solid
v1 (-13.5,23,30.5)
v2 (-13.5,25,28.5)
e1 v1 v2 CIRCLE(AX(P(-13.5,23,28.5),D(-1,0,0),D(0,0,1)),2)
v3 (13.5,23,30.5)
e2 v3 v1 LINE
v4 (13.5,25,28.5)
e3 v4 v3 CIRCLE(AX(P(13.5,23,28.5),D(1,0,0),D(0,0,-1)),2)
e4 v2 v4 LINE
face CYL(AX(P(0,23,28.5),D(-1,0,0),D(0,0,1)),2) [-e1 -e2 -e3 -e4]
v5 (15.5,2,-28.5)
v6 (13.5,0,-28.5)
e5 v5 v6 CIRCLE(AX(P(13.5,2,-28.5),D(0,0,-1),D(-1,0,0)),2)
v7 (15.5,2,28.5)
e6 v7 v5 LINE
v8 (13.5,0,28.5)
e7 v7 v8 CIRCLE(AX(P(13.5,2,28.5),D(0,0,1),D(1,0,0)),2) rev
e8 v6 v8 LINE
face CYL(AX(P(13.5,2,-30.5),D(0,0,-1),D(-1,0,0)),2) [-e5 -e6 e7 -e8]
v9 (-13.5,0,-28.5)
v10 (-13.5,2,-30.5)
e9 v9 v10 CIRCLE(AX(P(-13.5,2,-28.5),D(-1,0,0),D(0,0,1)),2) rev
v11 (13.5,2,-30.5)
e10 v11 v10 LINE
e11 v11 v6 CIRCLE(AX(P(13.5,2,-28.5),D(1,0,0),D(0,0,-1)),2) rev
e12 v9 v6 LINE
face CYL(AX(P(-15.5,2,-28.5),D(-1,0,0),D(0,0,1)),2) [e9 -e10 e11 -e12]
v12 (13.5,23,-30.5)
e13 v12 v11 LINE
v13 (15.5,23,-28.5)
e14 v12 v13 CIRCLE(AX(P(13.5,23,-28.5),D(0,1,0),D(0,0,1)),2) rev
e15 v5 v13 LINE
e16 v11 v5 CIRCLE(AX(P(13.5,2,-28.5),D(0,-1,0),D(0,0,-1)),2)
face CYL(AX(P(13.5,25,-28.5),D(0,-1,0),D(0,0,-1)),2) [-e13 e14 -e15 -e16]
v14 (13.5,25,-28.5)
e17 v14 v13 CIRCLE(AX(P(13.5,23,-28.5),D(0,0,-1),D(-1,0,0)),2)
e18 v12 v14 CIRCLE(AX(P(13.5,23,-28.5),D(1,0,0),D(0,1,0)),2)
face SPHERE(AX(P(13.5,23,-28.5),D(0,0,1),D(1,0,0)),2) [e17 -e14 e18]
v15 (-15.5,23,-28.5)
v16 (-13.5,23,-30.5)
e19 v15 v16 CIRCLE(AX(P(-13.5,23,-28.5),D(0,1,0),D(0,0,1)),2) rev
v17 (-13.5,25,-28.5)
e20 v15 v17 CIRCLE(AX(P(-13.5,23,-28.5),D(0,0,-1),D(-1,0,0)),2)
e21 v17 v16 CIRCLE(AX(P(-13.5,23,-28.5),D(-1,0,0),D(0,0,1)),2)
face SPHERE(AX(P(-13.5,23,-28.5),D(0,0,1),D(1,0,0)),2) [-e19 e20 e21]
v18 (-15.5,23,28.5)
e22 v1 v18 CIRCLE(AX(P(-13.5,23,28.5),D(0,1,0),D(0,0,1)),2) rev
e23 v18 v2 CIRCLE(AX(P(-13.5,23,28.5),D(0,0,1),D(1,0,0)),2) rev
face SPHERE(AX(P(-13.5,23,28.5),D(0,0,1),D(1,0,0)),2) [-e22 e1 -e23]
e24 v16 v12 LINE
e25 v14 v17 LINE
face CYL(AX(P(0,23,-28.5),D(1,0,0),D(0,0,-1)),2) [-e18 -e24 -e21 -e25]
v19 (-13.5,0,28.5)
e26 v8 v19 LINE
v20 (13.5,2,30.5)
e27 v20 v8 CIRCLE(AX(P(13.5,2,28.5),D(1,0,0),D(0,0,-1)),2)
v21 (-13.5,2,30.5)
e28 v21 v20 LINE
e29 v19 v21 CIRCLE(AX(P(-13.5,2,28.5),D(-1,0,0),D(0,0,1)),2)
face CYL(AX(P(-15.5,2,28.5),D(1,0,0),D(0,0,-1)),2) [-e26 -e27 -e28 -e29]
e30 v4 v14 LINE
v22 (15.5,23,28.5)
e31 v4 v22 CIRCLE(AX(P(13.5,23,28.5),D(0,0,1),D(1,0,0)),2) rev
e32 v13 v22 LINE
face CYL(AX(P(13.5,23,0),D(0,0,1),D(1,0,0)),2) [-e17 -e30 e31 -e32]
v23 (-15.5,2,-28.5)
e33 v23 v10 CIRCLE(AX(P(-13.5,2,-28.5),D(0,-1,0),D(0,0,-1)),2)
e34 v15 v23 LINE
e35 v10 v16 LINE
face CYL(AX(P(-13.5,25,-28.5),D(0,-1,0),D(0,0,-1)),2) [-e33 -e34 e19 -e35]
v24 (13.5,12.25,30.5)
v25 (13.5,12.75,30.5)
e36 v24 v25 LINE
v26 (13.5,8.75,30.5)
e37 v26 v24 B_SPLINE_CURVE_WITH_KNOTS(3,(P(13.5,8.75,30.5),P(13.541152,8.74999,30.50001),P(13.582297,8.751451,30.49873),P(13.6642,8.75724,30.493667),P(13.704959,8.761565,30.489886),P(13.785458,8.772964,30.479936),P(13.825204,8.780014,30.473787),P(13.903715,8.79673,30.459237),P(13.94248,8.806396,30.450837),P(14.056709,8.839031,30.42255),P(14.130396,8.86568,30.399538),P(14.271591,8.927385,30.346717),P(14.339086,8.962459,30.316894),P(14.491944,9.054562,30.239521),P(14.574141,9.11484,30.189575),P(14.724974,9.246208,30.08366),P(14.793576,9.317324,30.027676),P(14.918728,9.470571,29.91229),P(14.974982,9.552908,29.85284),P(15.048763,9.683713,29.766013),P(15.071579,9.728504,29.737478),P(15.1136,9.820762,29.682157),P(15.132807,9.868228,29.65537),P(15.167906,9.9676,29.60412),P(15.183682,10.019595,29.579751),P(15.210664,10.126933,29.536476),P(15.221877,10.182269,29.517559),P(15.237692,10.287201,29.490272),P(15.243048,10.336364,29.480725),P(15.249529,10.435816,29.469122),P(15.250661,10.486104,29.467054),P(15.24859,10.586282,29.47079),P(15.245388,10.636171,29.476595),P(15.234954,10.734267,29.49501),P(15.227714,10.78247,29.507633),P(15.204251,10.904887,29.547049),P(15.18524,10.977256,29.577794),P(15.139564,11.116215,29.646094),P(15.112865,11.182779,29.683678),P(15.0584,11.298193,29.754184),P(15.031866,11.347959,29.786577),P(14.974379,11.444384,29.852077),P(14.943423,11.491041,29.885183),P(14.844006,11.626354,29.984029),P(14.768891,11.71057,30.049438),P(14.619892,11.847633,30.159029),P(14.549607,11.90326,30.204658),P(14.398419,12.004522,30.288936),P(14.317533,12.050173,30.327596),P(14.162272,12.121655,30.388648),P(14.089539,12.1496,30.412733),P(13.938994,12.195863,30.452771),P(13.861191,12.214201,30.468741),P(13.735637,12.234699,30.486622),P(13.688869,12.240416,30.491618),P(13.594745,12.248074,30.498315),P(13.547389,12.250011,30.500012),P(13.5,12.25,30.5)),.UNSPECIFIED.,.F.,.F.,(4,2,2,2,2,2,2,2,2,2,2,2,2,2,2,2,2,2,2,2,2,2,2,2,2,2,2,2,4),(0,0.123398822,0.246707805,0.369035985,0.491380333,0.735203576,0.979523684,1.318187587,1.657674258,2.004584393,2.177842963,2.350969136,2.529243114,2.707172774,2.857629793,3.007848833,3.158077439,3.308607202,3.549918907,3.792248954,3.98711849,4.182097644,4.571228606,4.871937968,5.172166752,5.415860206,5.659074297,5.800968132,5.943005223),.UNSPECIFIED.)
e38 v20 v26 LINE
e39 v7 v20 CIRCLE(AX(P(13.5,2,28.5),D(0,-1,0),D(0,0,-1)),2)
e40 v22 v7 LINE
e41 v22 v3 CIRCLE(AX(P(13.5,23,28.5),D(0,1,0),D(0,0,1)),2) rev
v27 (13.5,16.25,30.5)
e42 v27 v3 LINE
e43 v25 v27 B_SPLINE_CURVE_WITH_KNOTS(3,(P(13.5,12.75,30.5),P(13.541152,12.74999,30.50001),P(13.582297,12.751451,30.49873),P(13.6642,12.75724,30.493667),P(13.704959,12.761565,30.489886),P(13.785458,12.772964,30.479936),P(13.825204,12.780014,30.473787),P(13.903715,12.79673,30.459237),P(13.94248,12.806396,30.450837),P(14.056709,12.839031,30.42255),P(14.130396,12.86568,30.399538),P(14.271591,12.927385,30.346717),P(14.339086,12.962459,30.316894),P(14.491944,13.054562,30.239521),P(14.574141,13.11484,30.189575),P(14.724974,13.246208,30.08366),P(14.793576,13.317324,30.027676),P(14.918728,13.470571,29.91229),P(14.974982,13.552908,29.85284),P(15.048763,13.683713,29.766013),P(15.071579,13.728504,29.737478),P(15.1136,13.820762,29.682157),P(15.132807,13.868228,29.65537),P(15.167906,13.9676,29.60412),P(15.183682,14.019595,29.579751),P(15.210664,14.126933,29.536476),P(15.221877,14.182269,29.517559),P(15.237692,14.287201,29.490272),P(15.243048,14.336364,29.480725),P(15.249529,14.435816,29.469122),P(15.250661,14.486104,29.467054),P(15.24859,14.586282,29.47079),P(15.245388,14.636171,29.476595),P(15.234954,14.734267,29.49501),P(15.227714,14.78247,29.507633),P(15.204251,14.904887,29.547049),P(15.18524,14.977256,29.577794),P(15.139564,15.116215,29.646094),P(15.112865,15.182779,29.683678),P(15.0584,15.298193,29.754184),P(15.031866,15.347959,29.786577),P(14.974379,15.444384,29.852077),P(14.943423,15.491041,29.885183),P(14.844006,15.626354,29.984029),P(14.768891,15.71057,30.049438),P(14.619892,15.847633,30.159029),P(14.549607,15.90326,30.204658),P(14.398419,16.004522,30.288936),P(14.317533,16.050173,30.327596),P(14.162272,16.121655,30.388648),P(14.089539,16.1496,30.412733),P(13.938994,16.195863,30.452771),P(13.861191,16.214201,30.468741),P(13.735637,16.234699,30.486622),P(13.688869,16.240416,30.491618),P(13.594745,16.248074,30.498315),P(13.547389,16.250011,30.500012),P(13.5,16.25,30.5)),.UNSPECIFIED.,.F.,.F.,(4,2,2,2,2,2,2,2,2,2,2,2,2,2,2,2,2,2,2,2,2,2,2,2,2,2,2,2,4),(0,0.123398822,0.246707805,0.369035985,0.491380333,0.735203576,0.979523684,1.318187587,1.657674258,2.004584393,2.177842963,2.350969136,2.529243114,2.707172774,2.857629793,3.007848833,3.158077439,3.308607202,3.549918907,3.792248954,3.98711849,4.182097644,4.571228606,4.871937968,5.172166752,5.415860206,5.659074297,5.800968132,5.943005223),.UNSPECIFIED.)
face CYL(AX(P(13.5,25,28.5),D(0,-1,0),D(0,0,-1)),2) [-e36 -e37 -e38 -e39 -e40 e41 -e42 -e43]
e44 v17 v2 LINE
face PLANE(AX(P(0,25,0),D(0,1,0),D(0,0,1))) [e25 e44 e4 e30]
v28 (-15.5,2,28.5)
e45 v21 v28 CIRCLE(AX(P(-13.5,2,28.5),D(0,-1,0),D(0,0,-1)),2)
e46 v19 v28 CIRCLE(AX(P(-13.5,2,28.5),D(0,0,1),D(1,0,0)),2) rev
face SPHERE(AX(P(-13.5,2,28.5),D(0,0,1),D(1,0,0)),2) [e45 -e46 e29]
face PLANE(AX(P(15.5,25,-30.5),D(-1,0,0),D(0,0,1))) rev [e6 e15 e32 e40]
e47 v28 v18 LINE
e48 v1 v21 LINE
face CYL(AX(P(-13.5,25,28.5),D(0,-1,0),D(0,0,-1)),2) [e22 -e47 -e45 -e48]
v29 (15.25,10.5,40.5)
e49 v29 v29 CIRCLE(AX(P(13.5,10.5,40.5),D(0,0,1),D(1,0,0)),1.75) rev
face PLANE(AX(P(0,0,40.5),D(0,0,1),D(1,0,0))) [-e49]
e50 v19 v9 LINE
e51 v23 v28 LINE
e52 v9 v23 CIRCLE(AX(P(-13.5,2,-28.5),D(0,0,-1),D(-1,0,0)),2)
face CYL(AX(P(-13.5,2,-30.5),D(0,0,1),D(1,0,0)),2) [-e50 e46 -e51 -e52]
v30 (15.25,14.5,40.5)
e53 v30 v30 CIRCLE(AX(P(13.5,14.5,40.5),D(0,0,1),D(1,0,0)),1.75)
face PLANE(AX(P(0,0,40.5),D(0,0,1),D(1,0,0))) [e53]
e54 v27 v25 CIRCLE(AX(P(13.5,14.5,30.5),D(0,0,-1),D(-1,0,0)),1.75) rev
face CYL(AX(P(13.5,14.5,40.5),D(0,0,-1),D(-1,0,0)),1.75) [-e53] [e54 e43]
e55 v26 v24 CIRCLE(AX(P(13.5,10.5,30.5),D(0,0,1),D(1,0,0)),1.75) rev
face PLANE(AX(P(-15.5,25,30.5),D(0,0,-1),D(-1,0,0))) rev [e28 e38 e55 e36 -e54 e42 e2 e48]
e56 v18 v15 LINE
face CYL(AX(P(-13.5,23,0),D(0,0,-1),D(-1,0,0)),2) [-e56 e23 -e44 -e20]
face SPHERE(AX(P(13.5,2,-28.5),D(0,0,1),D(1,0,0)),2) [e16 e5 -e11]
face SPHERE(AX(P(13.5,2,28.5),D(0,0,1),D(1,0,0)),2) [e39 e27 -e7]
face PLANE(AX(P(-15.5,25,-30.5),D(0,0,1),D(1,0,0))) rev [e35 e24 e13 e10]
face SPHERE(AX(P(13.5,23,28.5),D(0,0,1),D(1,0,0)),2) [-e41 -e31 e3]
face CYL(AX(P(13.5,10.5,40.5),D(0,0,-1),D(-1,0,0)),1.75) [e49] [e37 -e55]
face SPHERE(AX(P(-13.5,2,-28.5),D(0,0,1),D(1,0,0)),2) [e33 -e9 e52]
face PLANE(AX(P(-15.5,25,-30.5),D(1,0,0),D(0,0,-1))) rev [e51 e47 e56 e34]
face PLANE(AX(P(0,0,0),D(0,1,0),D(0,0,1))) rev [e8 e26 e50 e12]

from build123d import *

# Parameters (mm, degrees)
SKETCH1_W           = 31
SKETCH1_H           = 61
BOSS_EXTRUDE1_DEPTH = 25
SKETCH2_R           = 1.75
BOSS_EXTRUDE2_DEPTH = 10
FILLET1_R           = 2


with BuildPart() as part:
    # Sketch1 → Boss-Extrude1 (new body)
    with BuildSketch(Plane(origin=(0, 0, 0), x_dir=(1, 0, 0), z_dir=(0, 1, 0))):
        Rectangle(SKETCH1_W, SKETCH1_H)
    extrude(amount=BOSS_EXTRUDE1_DEPTH)

    # Sketch2 → Boss-Extrude2 (add)
    with BuildSketch(Plane.XY.offset(30.5)):
        with Locations(Location((13.5, 14.5, 0), (0, 0, 180))):
            Circle(SKETCH2_R)
        with Locations((13.5, 10.5)):
            Circle(SKETCH2_R)
    extrude(amount=BOSS_EXTRUDE2_DEPTH)

    # Fillet1
    # the kernel refuses this fillet: 2 mm, written as the material it takes off along each edge
    with BuildSketch(Plane(origin=(-13.5, 23, 28.5), x_dir=(0, 1, 0), z_dir=(-1, 0, 0))) as fillet1_piece_1_section:
        Polygon((0, 0), (FILLET1_R, 0), (FILLET1_R, -FILLET1_R), (0, -FILLET1_R), align=None)
    fillet1_piece_1 = extrude(amount=FILLET1_R, mode=Mode.PRIVATE)
    fillet1_piece_1 = fillet1_piece_1 - Plane(origin=(-13.5, 23, 28.5), x_dir=(0, -0.7071067811865475, -0.7071067811865475), z_dir=(-1, 0, 0)) * Sphere(FILLET1_R, mode=Mode.PRIVATE)
    add(fillet1_piece_1, mode=Mode.SUBTRACT)
    with BuildSketch(Plane(origin=(-13.5, 23, -28.5), x_dir=(-1, 0, 0), z_dir=(0, 0, -1))) as fillet1_piece_2_section:
        Polygon((0, 0), (FILLET1_R, 0), (FILLET1_R, FILLET1_R), (0, FILLET1_R), align=None)
    fillet1_piece_2 = extrude(amount=FILLET1_R, mode=Mode.PRIVATE)
    fillet1_piece_2 = fillet1_piece_2 - Plane(origin=(-13.5, 23, -28.5), x_dir=(0.7071067811865475, -0.7071067811865475, 0), z_dir=(0, 0, -1)) * Sphere(FILLET1_R, mode=Mode.PRIVATE)
    add(fillet1_piece_2, mode=Mode.SUBTRACT)
    with BuildSketch(Plane(origin=(13.5, 23, 28.5), x_dir=(0, 1, 0), z_dir=(1, 0, 0))) as fillet1_piece_3_section:
        Polygon((0, 0), (FILLET1_R, 0), (FILLET1_R, FILLET1_R), (0, FILLET1_R), align=None)
    fillet1_piece_3 = extrude(amount=FILLET1_R, mode=Mode.PRIVATE)
    fillet1_piece_3 = fillet1_piece_3 - Plane(origin=(13.5, 23, 28.5), x_dir=(0, -0.7071067811865475, -0.7071067811865475), z_dir=(1, 0, 0)) * Sphere(FILLET1_R, mode=Mode.PRIVATE)
    add(fillet1_piece_3, mode=Mode.SUBTRACT)
    with BuildSketch(Plane(origin=(13.5, 23, -28.5), x_dir=(1, 0, 0), z_dir=(0, 0, -1))) as fillet1_piece_4_section:
        Polygon((0, 0), (FILLET1_R, 0), (FILLET1_R, -FILLET1_R), (0, -FILLET1_R), align=None)
    fillet1_piece_4 = extrude(amount=FILLET1_R, mode=Mode.PRIVATE)
    fillet1_piece_4 = fillet1_piece_4 - Plane(origin=(13.5, 23, -28.5), x_dir=(-0.7071067811865475, -0.7071067811865475, 0), z_dir=(0, 0, -1)) * Sphere(FILLET1_R, mode=Mode.PRIVATE)
    add(fillet1_piece_4, mode=Mode.SUBTRACT)
    with BuildSketch(Plane(origin=(13.5, 2, 28.5), x_dir=(0, -1, 0), z_dir=(1, 0, 0))) as fillet1_piece_5_section:
        Polygon((0, 0), (FILLET1_R, 0), (FILLET1_R, -FILLET1_R), (0, -FILLET1_R), align=None)
    fillet1_piece_5 = extrude(amount=FILLET1_R, mode=Mode.PRIVATE)
    fillet1_piece_5 = fillet1_piece_5 - Plane(origin=(13.5, 2, 28.5), x_dir=(0, 0.7071067811865475, -0.7071067811865475), z_dir=(1, 0, 0)) * Sphere(FILLET1_R, mode=Mode.PRIVATE)
    add(fillet1_piece_5, mode=Mode.SUBTRACT)
    with BuildSketch(Plane(origin=(-13.5, 2, 28.5), x_dir=(0, -1, 0), z_dir=(-1, 0, 0))) as fillet1_piece_6_section:
        Polygon((0, 0), (FILLET1_R, 0), (FILLET1_R, FILLET1_R), (0, FILLET1_R), align=None)
    fillet1_piece_6 = extrude(amount=FILLET1_R, mode=Mode.PRIVATE)
    fillet1_piece_6 = fillet1_piece_6 - Plane(origin=(-13.5, 2, 28.5), x_dir=(0, 0.7071067811865475, -0.7071067811865475), z_dir=(-1, 0, 0)) * Sphere(FILLET1_R, mode=Mode.PRIVATE)
    add(fillet1_piece_6, mode=Mode.SUBTRACT)
    with BuildSketch(Plane(origin=(-13.5, 2, -28.5), x_dir=(-1, 0, 0), z_dir=(0, 0, -1))) as fillet1_piece_7_section:
        Polygon((0, 0), (FILLET1_R, 0), (FILLET1_R, -FILLET1_R), (0, -FILLET1_R), align=None)
    fillet1_piece_7 = extrude(amount=FILLET1_R, mode=Mode.PRIVATE)
    fillet1_piece_7 = fillet1_piece_7 - Plane(origin=(-13.5, 2, -28.5), x_dir=(0.7071067811865475, 0.7071067811865475, 0), z_dir=(0, 0, -1)) * Sphere(FILLET1_R, mode=Mode.PRIVATE)
    add(fillet1_piece_7, mode=Mode.SUBTRACT)
    with BuildSketch(Plane(origin=(13.5, 2, -28.5), x_dir=(1, 0, 0), z_dir=(0, 0, -1))) as fillet1_piece_8_section:
        Polygon((0, 0), (FILLET1_R, 0), (FILLET1_R, FILLET1_R), (0, FILLET1_R), align=None)
    fillet1_piece_8 = extrude(amount=FILLET1_R, mode=Mode.PRIVATE)
    fillet1_piece_8 = fillet1_piece_8 - Plane(origin=(13.5, 2, -28.5), x_dir=(-0.7071067811865475, 0.7071067811865475, 0), z_dir=(0, 0, -1)) * Sphere(FILLET1_R, mode=Mode.PRIVATE)
    add(fillet1_piece_8, mode=Mode.SUBTRACT)
    with BuildSketch(Plane(origin=(-15.5, 25, 28.5), x_dir=(0, -1, 0), z_dir=(0, 0, -1)), Plane(origin=(15.5, 25, -28.5), x_dir=(0, -1, 0), z_dir=(0, 0, 1))) as fillet1_piece_9:
        with BuildLine():
            CenterArc((FILLET1_R, -FILLET1_R), FILLET1_R, 90, 90)
            Line((0, -FILLET1_R), (0, 0))
            Line((0, 0), (FILLET1_R, 0))
        make_face()
    extrude(amount=57, mode=Mode.SUBTRACT)
    with BuildSketch(Plane(origin=(13.5, 25, 30.5), x_dir=(0, 0, -1), z_dir=(-1, 0, 0)), Plane(origin=(-13.5, 0, -30.5), x_dir=(0, 1, 0), z_dir=(1, 0, 0))) as fillet1_piece_10:
        with BuildLine():
            CenterArc((FILLET1_R, FILLET1_R), FILLET1_R, 180, 90)
            Line((0, FILLET1_R), (0, 0))
            Line((0, 0), (FILLET1_R, 0))
        make_face()
    extrude(amount=27, mode=Mode.SUBTRACT)
    with BuildSketch(Plane(origin=(13.5, 0, 30.5), x_dir=(0, 0, -1), z_dir=(-1, 0, 0)), Plane(origin=(-13.5, 25, -30.5), x_dir=(0, -1, 0), z_dir=(1, 0, 0))) as fillet1_piece_11:
        with BuildLine():
            CenterArc((FILLET1_R, -FILLET1_R), FILLET1_R, 90, 90)
            Line((0, -FILLET1_R), (0, 0))
            Line((0, 0), (FILLET1_R, 0))
        make_face()
    extrude(amount=27, mode=Mode.SUBTRACT)
    with BuildSketch(Plane(origin=(-15.5, 0, 28.5), x_dir=(0, 1, 0), z_dir=(0, 0, -1)), Plane(origin=(15.5, 0, -28.5), x_dir=(0, 1, 0), z_dir=(0, 0, 1))) as fillet1_piece_12:
        with BuildLine():
            CenterArc((FILLET1_R, FILLET1_R), FILLET1_R, 180, 90)
            Line((0, FILLET1_R), (0, 0))
            Line((0, 0), (FILLET1_R, 0))
        make_face()
    extrude(amount=57, mode=Mode.SUBTRACT)
    with BuildSketch(Plane(origin=(15.5, 2, 30.5), x_dir=(0, 0, -1), z_dir=(0, 1, 0))) as fillet1_piece_13_section:
        with BuildLine():
            CenterArc((FILLET1_R, FILLET1_R), FILLET1_R, 180, 90)
            Line((0, FILLET1_R), (0, 0))
            Line((0, 0), (FILLET1_R, 0))
        make_face()
    fillet1_piece_13 = extrude(amount=21, mode=Mode.PRIVATE)
    fillet1_piece_13 = fillet1_piece_13 - Plane(origin=(13.5, 14.5, 30.013488992), x_dir=(-1, 0, 0), z_dir=(0, 0, -1)) * Cylinder(1.75, 50, mode=Mode.PRIVATE)
    fillet1_piece_13 = fillet1_piece_13 - Plane(origin=(13.5, 10.5, 30.013488992), x_dir=(1, 0, 0), z_dir=(0, 0, -1)) * Cylinder(1.75, 50, mode=Mode.PRIVATE)
    add(fillet1_piece_13, mode=Mode.SUBTRACT)
    with BuildSketch(Plane(origin=(-15.5, 2, 30.5), x_dir=(0, 0, -1), z_dir=(0, 1, 0)), Plane(origin=(-15.5, 2, -30.5), x_dir=(1, 0, 0), z_dir=(0, 1, 0))) as fillet1_piece_14:
        with BuildLine():
            CenterArc((FILLET1_R, -FILLET1_R), FILLET1_R, 90, 90)
            Line((0, -FILLET1_R), (0, 0))
            Line((0, 0), (FILLET1_R, 0))
        make_face()
    extrude(amount=21, mode=Mode.SUBTRACT)
    with BuildSketch(Plane(origin=(15.5, 2, -30.5), x_dir=(-1, 0, 0), z_dir=(0, 1, 0))) as fillet1_piece_15:
        with BuildLine():
            CenterArc((FILLET1_R, FILLET1_R), FILLET1_R, 180, 90)
            Line((0, FILLET1_R), (0, 0))
            Line((0, 0), (FILLET1_R, 0))
        make_face()
    extrude(amount=21, mode=Mode.SUBTRACT)


solid = part.part
